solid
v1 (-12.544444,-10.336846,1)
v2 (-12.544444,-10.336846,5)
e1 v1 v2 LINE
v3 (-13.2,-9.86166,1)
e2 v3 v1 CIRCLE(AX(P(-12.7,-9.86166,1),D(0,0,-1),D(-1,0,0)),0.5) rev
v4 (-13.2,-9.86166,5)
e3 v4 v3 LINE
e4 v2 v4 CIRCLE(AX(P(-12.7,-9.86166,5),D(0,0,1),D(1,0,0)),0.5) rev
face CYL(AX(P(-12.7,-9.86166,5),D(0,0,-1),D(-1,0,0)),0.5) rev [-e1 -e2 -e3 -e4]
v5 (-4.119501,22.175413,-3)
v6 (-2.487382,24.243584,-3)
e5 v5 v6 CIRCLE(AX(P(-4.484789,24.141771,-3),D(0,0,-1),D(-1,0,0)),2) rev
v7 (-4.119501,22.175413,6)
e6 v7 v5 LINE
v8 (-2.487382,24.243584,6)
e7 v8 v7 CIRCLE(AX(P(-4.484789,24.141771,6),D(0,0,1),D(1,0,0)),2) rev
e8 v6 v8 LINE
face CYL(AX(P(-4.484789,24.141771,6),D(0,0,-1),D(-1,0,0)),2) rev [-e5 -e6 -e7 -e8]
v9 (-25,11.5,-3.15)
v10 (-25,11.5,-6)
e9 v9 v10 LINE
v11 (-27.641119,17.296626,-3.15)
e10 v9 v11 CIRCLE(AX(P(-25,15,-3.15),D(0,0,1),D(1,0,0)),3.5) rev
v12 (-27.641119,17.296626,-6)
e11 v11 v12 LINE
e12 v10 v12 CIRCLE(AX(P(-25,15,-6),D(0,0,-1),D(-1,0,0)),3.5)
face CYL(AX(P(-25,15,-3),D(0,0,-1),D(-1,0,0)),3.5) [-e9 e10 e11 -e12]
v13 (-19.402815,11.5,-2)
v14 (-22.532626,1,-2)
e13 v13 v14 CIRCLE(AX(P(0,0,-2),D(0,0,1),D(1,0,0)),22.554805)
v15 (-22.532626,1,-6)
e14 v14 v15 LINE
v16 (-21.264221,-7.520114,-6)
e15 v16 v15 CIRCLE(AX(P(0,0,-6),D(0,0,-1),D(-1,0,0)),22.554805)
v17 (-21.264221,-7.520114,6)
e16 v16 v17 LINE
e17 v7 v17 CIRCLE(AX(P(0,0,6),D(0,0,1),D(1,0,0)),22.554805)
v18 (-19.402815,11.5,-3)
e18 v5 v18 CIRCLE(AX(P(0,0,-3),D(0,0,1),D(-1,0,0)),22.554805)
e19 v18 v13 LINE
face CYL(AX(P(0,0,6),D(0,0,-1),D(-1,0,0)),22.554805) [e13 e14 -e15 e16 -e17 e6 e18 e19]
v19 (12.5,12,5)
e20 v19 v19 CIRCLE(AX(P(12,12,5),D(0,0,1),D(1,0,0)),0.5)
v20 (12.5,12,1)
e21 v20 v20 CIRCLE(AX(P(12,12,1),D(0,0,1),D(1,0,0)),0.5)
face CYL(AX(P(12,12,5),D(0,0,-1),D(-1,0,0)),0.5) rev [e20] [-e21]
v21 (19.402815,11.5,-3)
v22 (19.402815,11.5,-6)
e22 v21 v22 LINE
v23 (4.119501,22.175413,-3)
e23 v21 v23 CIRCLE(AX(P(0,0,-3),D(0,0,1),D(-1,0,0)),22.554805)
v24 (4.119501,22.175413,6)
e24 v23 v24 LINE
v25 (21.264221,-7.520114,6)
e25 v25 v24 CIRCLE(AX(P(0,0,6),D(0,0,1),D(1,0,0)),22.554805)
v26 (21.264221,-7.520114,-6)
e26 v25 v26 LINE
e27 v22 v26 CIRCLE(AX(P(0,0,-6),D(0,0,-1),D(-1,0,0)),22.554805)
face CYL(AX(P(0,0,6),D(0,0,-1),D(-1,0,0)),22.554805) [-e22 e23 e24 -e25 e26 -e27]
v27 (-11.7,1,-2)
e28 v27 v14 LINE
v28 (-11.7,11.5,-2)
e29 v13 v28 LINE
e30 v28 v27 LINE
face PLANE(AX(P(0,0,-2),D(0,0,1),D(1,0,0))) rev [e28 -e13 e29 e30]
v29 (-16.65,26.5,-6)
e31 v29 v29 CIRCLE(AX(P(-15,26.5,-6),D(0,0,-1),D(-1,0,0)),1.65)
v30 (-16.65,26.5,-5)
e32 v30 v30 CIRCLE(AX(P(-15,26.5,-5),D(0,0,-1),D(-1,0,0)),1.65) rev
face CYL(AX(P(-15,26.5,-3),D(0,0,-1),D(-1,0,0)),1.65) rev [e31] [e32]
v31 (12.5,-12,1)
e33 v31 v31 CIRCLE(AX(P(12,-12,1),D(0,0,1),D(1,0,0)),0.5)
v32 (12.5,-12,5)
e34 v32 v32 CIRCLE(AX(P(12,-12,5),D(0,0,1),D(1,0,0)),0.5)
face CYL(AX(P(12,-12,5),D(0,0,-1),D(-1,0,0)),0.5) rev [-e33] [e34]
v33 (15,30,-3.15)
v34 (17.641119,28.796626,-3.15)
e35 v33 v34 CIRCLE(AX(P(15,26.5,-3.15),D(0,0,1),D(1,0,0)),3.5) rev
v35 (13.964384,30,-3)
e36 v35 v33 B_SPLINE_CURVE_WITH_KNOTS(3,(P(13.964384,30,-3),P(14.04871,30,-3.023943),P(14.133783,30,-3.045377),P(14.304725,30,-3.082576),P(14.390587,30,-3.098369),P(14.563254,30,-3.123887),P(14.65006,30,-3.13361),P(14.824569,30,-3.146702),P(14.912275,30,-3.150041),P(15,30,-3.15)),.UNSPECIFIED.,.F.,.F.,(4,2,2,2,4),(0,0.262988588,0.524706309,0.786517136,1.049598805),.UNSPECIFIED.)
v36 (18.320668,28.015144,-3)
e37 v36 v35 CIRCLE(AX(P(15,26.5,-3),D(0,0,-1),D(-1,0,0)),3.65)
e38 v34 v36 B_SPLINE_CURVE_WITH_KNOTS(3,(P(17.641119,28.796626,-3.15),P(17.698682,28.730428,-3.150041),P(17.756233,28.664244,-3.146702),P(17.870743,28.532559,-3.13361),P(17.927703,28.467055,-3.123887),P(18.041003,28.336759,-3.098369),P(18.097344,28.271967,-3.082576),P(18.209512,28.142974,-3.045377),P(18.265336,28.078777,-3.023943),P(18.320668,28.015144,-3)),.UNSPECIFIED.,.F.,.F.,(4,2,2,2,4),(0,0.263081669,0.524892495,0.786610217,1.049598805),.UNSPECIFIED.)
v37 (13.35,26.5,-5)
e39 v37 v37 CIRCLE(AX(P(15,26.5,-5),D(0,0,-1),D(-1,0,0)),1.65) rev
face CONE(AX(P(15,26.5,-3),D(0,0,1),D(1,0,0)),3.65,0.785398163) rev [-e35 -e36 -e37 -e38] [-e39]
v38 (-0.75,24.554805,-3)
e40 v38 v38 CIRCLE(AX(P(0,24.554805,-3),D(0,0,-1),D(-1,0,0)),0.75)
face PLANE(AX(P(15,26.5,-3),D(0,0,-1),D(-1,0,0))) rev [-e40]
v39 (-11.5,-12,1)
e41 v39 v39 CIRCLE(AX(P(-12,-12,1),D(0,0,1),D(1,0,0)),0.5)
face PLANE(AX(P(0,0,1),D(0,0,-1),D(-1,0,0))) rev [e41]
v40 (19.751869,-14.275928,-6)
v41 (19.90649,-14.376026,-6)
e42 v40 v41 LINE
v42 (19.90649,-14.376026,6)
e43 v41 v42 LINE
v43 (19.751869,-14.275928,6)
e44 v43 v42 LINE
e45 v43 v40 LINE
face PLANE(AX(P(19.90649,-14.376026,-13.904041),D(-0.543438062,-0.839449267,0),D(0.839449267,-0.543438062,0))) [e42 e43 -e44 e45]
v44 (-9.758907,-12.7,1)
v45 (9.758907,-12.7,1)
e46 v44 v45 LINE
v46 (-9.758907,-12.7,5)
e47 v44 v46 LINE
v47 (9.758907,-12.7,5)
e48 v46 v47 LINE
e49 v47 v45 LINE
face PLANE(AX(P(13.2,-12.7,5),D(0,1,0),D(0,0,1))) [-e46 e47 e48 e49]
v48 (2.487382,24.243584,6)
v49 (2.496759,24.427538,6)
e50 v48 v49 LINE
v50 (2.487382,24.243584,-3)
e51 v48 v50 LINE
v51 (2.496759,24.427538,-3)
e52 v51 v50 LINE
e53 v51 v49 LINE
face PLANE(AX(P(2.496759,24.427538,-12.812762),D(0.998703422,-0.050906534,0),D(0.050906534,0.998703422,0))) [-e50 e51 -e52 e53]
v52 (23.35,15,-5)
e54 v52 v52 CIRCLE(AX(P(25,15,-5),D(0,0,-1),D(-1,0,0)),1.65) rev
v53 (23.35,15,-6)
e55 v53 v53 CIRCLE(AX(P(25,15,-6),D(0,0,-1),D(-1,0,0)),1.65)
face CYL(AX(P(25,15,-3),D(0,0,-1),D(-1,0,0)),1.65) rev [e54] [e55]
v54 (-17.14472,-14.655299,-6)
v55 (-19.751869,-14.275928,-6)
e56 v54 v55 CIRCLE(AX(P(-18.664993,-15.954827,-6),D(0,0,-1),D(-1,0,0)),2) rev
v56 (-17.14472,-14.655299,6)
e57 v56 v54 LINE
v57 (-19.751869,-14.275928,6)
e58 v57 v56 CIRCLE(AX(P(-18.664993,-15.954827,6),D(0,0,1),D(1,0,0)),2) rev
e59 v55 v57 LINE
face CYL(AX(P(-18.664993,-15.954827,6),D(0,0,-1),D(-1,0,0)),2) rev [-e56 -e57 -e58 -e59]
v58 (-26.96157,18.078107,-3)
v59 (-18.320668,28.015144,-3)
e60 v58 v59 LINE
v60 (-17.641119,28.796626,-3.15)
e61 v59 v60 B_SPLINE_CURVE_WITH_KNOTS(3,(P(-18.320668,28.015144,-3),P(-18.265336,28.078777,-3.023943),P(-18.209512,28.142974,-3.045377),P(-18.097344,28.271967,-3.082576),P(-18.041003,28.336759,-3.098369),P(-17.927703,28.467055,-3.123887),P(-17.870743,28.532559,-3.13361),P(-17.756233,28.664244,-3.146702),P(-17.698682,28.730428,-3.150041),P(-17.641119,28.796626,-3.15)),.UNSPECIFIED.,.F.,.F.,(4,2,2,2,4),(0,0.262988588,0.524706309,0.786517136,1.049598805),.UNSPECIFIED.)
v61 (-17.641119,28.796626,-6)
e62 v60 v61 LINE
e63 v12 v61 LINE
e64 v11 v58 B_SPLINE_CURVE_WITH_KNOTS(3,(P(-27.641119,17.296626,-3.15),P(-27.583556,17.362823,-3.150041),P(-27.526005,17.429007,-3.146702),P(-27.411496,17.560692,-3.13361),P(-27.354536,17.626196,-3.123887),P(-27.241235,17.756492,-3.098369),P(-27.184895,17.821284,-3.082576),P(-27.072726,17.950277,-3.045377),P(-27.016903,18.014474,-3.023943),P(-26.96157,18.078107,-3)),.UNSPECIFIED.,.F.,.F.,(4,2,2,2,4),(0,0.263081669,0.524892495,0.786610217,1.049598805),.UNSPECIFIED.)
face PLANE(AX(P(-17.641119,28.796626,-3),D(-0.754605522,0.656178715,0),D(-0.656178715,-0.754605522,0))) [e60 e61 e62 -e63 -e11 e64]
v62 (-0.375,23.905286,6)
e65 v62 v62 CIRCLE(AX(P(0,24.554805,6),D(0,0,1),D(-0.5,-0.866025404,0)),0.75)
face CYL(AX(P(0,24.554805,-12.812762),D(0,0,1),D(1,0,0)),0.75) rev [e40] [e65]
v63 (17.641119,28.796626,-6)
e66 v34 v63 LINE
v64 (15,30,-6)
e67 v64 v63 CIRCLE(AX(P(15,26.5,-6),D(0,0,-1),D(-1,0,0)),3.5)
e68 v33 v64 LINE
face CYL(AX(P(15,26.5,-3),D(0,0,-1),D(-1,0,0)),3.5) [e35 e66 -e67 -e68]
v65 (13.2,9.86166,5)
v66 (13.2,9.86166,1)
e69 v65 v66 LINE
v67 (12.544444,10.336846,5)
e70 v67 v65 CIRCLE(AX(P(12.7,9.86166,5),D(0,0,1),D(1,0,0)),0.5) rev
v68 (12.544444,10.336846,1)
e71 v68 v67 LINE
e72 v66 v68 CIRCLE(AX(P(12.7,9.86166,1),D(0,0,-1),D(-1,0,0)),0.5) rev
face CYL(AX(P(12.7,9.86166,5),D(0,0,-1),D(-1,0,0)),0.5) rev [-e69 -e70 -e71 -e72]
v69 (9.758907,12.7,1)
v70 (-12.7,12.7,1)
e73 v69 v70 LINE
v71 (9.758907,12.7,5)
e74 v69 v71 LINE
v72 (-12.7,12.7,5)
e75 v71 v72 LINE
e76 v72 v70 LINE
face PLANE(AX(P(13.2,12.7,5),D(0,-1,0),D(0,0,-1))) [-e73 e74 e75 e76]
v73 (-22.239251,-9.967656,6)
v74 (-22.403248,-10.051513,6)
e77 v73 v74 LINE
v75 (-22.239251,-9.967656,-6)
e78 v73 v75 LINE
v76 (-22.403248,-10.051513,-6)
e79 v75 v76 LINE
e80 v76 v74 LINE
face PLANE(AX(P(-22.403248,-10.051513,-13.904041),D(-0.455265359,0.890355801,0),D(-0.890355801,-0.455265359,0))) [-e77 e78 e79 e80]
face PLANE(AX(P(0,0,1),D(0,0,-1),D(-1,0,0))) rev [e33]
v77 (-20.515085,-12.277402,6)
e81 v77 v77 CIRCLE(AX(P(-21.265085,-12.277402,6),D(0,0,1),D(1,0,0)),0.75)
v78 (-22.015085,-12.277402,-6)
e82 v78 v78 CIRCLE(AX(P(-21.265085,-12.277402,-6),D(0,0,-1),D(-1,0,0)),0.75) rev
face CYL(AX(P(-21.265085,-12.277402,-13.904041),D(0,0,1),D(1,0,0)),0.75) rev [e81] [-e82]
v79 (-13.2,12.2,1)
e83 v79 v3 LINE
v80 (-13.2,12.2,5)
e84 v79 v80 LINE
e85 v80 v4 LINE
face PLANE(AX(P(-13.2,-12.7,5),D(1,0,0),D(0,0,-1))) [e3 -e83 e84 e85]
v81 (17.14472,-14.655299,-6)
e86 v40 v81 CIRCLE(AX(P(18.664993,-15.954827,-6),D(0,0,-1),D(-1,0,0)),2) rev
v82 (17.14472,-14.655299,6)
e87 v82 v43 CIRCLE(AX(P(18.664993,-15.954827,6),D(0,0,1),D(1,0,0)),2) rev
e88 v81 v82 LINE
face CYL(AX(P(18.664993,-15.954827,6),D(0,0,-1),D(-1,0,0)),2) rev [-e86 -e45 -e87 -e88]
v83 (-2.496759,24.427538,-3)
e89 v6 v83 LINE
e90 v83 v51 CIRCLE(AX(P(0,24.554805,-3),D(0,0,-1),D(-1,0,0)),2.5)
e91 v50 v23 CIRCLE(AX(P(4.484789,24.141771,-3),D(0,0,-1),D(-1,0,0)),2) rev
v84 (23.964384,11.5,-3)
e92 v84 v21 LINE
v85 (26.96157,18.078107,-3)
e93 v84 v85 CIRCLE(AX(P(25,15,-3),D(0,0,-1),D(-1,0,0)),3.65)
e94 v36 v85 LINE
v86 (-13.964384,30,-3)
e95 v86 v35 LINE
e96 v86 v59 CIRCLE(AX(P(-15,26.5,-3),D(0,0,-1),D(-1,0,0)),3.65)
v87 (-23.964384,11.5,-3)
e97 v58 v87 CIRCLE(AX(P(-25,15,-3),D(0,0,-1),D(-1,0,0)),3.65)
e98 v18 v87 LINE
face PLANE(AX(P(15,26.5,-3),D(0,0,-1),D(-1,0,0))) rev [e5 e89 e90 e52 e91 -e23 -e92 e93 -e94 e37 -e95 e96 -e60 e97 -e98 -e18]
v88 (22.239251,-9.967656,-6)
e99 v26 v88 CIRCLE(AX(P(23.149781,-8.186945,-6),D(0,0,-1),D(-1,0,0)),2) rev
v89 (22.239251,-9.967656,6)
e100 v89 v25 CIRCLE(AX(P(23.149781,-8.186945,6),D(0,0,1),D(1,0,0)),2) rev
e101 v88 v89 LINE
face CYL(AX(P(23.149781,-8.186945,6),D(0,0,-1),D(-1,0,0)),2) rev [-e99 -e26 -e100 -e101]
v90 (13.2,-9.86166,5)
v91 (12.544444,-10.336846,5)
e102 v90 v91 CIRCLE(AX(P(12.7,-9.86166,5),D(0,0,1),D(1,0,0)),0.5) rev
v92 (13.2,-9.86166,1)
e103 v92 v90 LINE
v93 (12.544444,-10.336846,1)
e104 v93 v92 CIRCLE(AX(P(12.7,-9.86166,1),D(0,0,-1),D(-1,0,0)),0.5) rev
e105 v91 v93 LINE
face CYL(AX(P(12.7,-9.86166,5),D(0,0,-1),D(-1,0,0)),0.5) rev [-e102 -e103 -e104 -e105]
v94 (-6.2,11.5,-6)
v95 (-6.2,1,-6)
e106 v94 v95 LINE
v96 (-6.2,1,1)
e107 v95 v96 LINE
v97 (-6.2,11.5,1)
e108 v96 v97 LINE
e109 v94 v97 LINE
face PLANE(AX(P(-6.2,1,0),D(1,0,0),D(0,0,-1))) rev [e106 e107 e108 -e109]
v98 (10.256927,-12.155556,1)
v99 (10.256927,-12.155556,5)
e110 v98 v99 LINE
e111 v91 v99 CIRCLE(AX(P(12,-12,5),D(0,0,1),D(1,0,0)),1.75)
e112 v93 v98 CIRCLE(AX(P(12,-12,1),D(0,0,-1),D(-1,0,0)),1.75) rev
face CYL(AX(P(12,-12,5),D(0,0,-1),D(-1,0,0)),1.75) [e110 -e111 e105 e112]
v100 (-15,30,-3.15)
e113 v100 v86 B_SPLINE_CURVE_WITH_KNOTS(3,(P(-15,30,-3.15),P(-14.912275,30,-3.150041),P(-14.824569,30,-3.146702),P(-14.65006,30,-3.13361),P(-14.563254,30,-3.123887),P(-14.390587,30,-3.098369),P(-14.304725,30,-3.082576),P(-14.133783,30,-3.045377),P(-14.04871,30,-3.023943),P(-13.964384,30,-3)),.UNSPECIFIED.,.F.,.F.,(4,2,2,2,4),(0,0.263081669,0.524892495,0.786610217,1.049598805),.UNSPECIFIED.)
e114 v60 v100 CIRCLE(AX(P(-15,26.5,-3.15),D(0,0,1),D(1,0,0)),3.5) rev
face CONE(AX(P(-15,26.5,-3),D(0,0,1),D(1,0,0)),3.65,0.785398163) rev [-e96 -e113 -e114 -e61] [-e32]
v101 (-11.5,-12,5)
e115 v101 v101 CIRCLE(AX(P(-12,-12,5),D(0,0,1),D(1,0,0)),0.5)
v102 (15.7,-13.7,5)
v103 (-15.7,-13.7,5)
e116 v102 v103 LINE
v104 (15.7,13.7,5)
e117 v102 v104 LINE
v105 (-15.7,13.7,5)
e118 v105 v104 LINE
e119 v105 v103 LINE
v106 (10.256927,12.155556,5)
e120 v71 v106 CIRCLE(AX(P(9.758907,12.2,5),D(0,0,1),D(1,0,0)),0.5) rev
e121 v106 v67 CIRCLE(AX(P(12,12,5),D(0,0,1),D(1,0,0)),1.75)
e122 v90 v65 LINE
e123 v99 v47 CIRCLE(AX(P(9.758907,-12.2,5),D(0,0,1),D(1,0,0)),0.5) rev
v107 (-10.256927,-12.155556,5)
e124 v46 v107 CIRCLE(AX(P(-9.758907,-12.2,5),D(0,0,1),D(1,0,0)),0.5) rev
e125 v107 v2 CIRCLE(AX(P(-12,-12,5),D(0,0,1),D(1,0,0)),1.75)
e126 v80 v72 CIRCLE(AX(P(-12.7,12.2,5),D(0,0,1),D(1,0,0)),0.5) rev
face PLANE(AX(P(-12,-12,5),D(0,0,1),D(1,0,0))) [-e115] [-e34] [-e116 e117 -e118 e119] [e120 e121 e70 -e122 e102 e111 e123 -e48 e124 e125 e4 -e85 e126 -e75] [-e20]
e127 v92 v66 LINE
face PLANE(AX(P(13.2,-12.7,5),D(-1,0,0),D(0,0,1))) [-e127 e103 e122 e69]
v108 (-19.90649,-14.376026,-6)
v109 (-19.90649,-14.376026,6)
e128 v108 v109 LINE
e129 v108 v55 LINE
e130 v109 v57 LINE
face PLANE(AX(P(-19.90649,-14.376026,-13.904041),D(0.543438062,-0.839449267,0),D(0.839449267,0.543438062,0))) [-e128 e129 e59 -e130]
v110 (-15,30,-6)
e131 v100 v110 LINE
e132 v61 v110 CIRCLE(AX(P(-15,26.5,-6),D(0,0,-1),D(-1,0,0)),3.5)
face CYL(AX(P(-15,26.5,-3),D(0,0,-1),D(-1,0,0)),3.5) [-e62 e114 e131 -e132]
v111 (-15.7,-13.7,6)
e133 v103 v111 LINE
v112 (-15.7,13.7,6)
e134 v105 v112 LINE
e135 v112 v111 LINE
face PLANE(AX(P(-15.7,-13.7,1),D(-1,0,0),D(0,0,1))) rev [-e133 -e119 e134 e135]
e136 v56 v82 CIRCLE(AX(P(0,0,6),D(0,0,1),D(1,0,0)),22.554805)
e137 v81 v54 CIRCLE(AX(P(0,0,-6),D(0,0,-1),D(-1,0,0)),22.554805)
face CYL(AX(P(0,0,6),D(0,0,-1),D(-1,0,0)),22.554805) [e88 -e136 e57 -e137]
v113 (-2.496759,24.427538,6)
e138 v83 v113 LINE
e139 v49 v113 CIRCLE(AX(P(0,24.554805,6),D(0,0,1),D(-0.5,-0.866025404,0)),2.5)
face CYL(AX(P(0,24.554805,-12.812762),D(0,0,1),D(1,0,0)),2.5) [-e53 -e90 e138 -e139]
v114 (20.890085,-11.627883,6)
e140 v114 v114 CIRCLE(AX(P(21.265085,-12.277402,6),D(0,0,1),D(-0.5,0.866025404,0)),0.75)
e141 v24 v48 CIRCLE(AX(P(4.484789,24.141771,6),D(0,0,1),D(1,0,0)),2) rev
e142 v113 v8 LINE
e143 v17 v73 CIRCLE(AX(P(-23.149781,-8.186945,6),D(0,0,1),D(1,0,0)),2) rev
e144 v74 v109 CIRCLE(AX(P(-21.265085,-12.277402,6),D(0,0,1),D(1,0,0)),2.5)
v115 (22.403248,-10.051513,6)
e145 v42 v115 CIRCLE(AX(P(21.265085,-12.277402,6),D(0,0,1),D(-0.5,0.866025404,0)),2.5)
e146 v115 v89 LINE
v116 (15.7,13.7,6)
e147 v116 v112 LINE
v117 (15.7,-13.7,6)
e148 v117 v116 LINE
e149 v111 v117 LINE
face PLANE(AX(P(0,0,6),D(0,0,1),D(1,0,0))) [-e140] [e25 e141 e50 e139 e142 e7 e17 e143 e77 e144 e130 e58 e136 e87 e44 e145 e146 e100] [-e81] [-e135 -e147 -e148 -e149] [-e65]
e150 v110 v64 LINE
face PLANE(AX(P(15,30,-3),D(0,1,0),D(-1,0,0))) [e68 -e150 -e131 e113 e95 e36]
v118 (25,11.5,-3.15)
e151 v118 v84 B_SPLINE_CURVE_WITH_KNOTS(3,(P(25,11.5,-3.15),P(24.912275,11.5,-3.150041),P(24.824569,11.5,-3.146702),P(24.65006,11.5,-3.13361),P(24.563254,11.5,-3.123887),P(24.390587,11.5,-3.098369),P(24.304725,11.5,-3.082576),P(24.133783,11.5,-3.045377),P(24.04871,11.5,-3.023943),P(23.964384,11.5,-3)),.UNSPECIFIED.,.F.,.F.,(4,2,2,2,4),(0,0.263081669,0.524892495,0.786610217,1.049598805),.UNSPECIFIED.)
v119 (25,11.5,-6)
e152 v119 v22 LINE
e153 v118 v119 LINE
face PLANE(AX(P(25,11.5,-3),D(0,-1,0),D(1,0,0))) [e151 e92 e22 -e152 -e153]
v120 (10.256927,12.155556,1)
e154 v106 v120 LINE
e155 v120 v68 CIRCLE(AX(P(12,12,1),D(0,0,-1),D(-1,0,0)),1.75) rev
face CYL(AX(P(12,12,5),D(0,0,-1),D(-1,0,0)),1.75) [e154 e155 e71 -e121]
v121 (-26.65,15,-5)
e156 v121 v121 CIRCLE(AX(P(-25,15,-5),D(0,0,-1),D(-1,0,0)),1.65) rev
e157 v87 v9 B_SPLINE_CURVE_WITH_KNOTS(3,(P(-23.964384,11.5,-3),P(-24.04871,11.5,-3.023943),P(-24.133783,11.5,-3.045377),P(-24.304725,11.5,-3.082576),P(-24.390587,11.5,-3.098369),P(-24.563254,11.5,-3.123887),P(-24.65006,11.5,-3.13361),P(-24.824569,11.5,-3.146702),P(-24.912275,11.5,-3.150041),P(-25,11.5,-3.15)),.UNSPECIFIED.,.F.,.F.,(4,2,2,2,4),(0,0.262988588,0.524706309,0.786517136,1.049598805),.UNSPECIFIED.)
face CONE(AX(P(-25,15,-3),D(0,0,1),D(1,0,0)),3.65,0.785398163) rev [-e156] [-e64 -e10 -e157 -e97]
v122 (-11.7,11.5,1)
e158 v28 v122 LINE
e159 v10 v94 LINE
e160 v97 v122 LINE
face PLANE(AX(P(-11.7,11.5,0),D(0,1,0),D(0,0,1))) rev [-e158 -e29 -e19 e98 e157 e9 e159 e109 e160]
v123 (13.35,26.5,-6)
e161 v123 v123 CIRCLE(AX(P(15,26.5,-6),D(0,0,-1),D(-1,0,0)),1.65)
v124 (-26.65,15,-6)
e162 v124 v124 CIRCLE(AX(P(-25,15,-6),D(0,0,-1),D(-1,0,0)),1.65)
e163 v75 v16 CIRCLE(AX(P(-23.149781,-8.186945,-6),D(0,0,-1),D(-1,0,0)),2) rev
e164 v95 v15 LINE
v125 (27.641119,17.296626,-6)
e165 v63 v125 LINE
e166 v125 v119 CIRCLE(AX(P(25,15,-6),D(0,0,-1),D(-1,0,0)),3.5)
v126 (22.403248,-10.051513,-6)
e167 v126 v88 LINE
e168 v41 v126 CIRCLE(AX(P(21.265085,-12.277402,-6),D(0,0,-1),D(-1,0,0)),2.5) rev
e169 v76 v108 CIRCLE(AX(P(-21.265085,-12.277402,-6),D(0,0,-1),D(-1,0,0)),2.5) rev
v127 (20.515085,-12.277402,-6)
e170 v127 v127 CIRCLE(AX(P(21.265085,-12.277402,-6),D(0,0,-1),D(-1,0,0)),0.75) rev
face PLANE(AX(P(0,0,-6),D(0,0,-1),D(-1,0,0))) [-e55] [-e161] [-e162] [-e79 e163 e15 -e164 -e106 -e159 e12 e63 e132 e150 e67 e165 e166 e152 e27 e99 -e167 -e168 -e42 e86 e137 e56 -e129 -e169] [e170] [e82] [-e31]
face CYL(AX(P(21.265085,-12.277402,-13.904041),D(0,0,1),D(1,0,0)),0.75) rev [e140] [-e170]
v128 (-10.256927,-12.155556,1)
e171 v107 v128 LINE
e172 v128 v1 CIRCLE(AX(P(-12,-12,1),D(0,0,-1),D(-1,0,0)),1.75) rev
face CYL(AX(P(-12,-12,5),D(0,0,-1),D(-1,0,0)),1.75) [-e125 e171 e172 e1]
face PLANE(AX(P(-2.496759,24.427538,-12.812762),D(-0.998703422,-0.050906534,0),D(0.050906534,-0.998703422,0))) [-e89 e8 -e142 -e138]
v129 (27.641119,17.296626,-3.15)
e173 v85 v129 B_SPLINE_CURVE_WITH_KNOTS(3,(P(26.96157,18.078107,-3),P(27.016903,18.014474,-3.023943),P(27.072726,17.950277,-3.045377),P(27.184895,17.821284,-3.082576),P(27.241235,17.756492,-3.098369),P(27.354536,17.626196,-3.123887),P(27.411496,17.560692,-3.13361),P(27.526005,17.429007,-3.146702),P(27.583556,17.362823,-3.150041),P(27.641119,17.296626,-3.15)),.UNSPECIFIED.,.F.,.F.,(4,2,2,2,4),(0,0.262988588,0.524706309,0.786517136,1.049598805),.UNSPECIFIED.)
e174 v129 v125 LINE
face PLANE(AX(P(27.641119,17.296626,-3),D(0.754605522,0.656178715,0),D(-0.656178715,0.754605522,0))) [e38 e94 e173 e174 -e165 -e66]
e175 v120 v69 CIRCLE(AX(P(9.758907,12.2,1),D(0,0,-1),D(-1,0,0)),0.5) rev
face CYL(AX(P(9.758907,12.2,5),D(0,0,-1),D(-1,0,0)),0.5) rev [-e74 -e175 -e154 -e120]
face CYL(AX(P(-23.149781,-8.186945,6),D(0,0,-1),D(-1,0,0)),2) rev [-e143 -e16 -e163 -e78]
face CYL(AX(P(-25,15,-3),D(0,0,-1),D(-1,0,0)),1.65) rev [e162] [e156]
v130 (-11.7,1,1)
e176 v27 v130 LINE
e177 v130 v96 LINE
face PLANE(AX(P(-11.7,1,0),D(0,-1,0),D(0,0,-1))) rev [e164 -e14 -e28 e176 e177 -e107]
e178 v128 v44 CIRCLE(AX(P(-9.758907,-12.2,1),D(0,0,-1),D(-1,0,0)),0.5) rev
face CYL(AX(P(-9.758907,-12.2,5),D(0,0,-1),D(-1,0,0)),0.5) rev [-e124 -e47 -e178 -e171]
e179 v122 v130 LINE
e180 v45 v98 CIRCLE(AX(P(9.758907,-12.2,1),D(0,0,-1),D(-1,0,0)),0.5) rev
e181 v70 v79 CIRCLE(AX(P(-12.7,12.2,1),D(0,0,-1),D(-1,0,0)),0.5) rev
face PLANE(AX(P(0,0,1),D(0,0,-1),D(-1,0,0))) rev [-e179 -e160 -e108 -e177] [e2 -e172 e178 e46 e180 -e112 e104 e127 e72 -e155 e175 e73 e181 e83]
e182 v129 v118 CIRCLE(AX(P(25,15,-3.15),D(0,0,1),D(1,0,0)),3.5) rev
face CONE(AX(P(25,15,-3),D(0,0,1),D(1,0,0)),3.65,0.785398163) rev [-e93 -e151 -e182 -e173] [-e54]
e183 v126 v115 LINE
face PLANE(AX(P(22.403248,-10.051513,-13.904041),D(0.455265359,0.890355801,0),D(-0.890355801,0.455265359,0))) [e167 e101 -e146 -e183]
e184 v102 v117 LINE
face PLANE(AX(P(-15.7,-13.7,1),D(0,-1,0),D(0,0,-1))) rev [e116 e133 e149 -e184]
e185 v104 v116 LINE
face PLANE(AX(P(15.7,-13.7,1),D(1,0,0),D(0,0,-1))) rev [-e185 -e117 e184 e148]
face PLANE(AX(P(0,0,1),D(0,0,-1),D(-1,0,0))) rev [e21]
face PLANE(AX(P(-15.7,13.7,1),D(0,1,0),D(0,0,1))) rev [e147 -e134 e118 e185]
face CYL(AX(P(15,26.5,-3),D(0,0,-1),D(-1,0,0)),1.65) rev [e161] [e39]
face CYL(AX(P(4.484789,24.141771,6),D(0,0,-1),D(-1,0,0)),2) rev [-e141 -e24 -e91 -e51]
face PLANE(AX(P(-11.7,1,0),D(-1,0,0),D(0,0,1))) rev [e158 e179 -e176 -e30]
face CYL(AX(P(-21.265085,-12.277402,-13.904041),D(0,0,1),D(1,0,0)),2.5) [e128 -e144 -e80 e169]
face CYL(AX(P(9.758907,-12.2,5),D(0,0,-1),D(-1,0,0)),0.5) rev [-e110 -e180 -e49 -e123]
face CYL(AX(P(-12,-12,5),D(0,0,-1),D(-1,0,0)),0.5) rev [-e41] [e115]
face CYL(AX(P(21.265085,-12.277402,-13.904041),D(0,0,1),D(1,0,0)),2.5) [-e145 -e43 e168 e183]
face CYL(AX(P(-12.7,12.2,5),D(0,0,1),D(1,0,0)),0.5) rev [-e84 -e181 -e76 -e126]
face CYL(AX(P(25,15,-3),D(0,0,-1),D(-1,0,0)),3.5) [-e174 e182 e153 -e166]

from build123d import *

# Parameters (mm, degrees)
SKETCH_1_R                       = 22.554804791
EXTRUDE_463_DEPTH                = 6
SKETCH_2_W                       = 31.4
SKETCH_2_H                       = 27.4
CUT_EXTRUDE_592_DEPTH            = 5
SKETCH_3_R                       = 1.75
SKETCH_3_R_2                     = 0.5
EXTRUDE_810_DEPTH                = 4
SKETCH_4_W                       = 5.5
SKETCH_4_H                       = 10.5
USB_DEPTH                        = 33.28681524
SKETCH_5_W                       = 31.4
SKETCH_5_H                       = 27.4
SKETCH_5_W_2                     = 26.4
SKETCH_5_H_2                     = 25.4
EXTRUDE_1363_DEPTH               = 4
FILLET_1_R                       = 0.5
EXTRUDE_START                    = 6
SKETCH_6_R                       = 22.554804791
SKETCH_6_W                       = 5.5
SKETCH_6_H                       = 10.5
EXTRUDE_1904_DEPTH               = 6
SKETCH_7_W                       = 10.832625661
SKETCH_7_H                       = 10.5
CUT_EXTRUDE_2094_DEPTH           = 4
SKETCH_8_R                       = 1.65
EXTRUDE_2468_DEPTH               = 3
CHAMFER_1_SIZE                   = 2
EXTRUDE_START_2                  = -12
SKETCH_14_R                      = 0.75
EXTRUDE_2869_DEPTH               = 12
FILLET_3_R                       = 2
PATTERN_CIRCULAR_1_COUNT         = 3
FILLET_3_OF_PATTERN_CIRCULAR_1_R = 2


with BuildPart() as part:
    # Эскиз1 → Extrude 463 (new body)
    with BuildSketch(Plane.XY):
        Circle(SKETCH_1_R)
    extrude(amount=EXTRUDE_463_DEPTH)

    # Эскиз2 → Cut-Extrude 592 (cut)
    with BuildSketch(Plane.XY.offset(6)):
        Rectangle(SKETCH_2_W, SKETCH_2_H)
    extrude(amount=-CUT_EXTRUDE_592_DEPTH, mode=Mode.SUBTRACT)

    # Эскиз3 → Extrude 810 (add)
    # profile 1 of 3: a face of its own
    with BuildSketch(Plane.XY.offset(1)):
        with Locations((-12, -12)):
            Circle(SKETCH_3_R)
        with Locations((-12, -12)):
            Circle(SKETCH_3_R_2, mode=Mode.SUBTRACT)
    # profile 2 of 3: a face of its own
    with BuildSketch(Plane.XY.offset(1)):
        with Locations((12, -12)):
            Circle(SKETCH_3_R)
        with Locations((12, -12)):
            Circle(SKETCH_3_R_2, mode=Mode.SUBTRACT)
    # profile 3 of 3: a face of its own
    with BuildSketch(Plane.XY.offset(1)):
        with Locations((12, 12)):
            Circle(SKETCH_3_R)
        with Locations((12, 12)):
            Circle(SKETCH_3_R_2, mode=Mode.SUBTRACT)
    extrude(amount=EXTRUDE_810_DEPTH)

    # Эскиз4 → usb (cut, through all)
    with BuildSketch(Plane.XY.offset(1)):
        with Locations((-8.95, 6.25)):
            Rectangle(SKETCH_4_W, SKETCH_4_H)
    extrude(amount=-USB_DEPTH, mode=Mode.SUBTRACT)

    # Эскиз5 → Extrude 1363 (add)
    with BuildSketch(Plane.XY.offset(1)):
        Rectangle(SKETCH_5_W, SKETCH_5_H)
        Rectangle(SKETCH_5_W_2, SKETCH_5_H_2, mode=Mode.SUBTRACT)
    extrude(amount=EXTRUDE_1363_DEPTH)

    # Скругление1
    fillet_1_edges = [part.edges().sort_by_distance(p)[0] for p in [
        (10.396098507, 12.7, 3),
        (13.2, 10.72622608, 3),
        (10.396098507, -12.7, 3),
        (-13.2, -10.72622608, 3),
        (-10.396098507, -12.7, 3),
        (13.2, -10.72622608, 3),
        (-13.2, 12.7, 3),
    ]]
    fillet(fillet_1_edges, radius=FILLET_1_R)

    # Эскиз6 → Extrude 1904 (add)
    with BuildSketch(Plane(origin=(0, 0, 0), x_dir=(-1, 0, 0), z_dir=(0, 0, -1)).offset(EXTRUDE_START)):
        Circle(SKETCH_6_R)
        with Locations((8.95, 6.25)):
            Rectangle(SKETCH_6_W, SKETCH_6_H, mode=Mode.SUBTRACT)
    extrude(amount=-EXTRUDE_1904_DEPTH)

    # Эскиз7 → Cut-Extrude 2094 (cut)
    with BuildSketch(Plane(origin=(0, 0, -6), x_dir=(-1, 0, 0), z_dir=(0, 0, -1))):
        with Locations((17.116312831, 6.25)):
            Rectangle(SKETCH_7_W, SKETCH_7_H)
    extrude(amount=-CUT_EXTRUDE_2094_DEPTH, mode=Mode.SUBTRACT)

    # Эскиз8 → Extrude 2468 (add)
    with BuildSketch(Plane(origin=(0, 0, -6), x_dir=(-1, 0, 0), z_dir=(0, 0, -1))):
        with BuildLine():
            Line((-25, 11.5), (-19.402814723, 11.5))
            ThreePointArc((-19.402814723, 11.5), (0, 22.554804791), (19.402814723, 11.5))
            Line((19.402814723, 11.5), (25, 11.5))
            ThreePointArc((25, 11.5), (28.184979534, 13.548826209), (27.641119328, 17.296625502))
            Line((27.641119328, 17.296625502), (17.641119328, 28.796625502))
            ThreePointArc((17.641119328, 28.796625502), (16.451173791, 29.684979534), (15, 30))
            Line((15, 30), (-15, 30))
            ThreePointArc((-15, 30), (-16.451173791, 29.684979534), (-17.641119328, 28.796625502))
            Line((-17.641119328, 28.796625502), (-27.641119328, 17.296625502))
            ThreePointArc((-27.641119328, 17.296625502), (-28.184979534, 13.548826209), (-25, 11.5))
        make_face()
        with Locations((-15, 26.5)):
            Circle(SKETCH_8_R, mode=Mode.SUBTRACT)
        with Locations((15, 26.5)):
            Circle(SKETCH_8_R, mode=Mode.SUBTRACT)
        with Locations((25, 15)):
            Circle(SKETCH_8_R, mode=Mode.SUBTRACT)
        with Locations((-25, 15)):
            Circle(SKETCH_8_R, mode=Mode.SUBTRACT)
    extrude(amount=-EXTRUDE_2468_DEPTH)

    # Фаска1
    # the kernel refuses this chamfer: 2 mm, written as the material it takes off along each edge
    with BuildSketch(Plane(origin=(-25, 15, -3), x_dir=(-1, 0, 0), z_dir=(0, -1, 0))) as chamfer_1_piece_1:
        Polygon((1.65 + CHAMFER_1_SIZE, 0), (1.65, CHAMFER_1_SIZE), (1.65, 0), align=None)
    revolve(axis=Axis((-25, 15, -3), (0, 0, -1)), mode=Mode.SUBTRACT)
    with BuildSketch(Plane(origin=(-15, 26.5, -3), x_dir=(-1, 0, 0), z_dir=(0, -1, 0))) as chamfer_1_piece_2:
        Polygon((1.65 + CHAMFER_1_SIZE, 0), (1.65, CHAMFER_1_SIZE), (1.65, 0), align=None)
    revolve(axis=Axis((-15, 26.5, -3), (0, 0, -1)), mode=Mode.SUBTRACT)
    with BuildSketch(Plane(origin=(25, 15, -3), x_dir=(-1, 0, 0), z_dir=(0, -1, 0))) as chamfer_1_piece_3:
        Polygon((1.65 + CHAMFER_1_SIZE, 0), (1.65, CHAMFER_1_SIZE), (1.65, 0), align=None)
    revolve(axis=Axis((25, 15, -3), (0, 0, -1)), mode=Mode.SUBTRACT)
    with BuildSketch(Plane(origin=(15, 26.5, -3), x_dir=(-1, 0, 0), z_dir=(0, -1, 0))) as chamfer_1_piece_4:
        Polygon((1.65 + CHAMFER_1_SIZE, 0), (1.65, CHAMFER_1_SIZE), (1.65, 0), align=None)
    revolve(axis=Axis((15, 26.5, -3), (0, 0, -1)), mode=Mode.SUBTRACT)

    # Эскиз14 → Extrude 2869 (add)
    with BuildSketch(Plane.XY.offset(6).offset(EXTRUDE_START_2)):
        with BuildLine():
            Line((-22.403248133, -10.051512893), (-20.620019257, -9.139695017))
            ThreePointArc((-20.620019257, -9.139695017), (-19.533033926, -11.277402396), (-18.225217696, -13.287612994))
            Line((-18.225217696, -13.287612994), (-19.906489578, -14.376025564))
            ThreePointArc((-19.906489578, -14.376025564), (-23.430148244, -13.527402396), (-22.403248133, -10.051512893))
        make_face()
        with Locations((-21.265084734, -12.277402396)):
            Circle(SKETCH_14_R, mode=Mode.SUBTRACT)
    extrude_2869 = extrude(amount=EXTRUDE_2869_DEPTH)

    # Скругление3
    fillet_3_edges = [part.edges().sort_by_distance(p)[0] for p in [
        (-20.620019257, -9.139695017, 0),
        (-18.225217696, -13.287612994, 0),
    ]]
    fillet(fillet_3_edges, radius=FILLET_3_R)

    # Круговой массив1: Extrude 2869 ×3 about axis
    pattern_circular_1_axis = Axis((0, 0, 0), (0, 0, 1))
    for i in range(1, PATTERN_CIRCULAR_1_COUNT):
        add(extrude_2869.rotate(pattern_circular_1_axis, i * 360 / PATTERN_CIRCULAR_1_COUNT))

    # Скругление3 of Круговой массив1
    fillet_3_of_pattern_circular_1_edges = [part.edges().sort_by_distance(p)[0] for p in [
        (18.225217696, -13.287612994, 0),
        (20.620019257, -9.139695017, 0),
        (2.394801561, 22.427308012, 0),
        (-2.394801561, 22.427308012, 0),
    ]]
    fillet(fillet_3_of_pattern_circular_1_edges, radius=FILLET_3_OF_PATTERN_CIRCULAR_1_R)


solid = part.part
